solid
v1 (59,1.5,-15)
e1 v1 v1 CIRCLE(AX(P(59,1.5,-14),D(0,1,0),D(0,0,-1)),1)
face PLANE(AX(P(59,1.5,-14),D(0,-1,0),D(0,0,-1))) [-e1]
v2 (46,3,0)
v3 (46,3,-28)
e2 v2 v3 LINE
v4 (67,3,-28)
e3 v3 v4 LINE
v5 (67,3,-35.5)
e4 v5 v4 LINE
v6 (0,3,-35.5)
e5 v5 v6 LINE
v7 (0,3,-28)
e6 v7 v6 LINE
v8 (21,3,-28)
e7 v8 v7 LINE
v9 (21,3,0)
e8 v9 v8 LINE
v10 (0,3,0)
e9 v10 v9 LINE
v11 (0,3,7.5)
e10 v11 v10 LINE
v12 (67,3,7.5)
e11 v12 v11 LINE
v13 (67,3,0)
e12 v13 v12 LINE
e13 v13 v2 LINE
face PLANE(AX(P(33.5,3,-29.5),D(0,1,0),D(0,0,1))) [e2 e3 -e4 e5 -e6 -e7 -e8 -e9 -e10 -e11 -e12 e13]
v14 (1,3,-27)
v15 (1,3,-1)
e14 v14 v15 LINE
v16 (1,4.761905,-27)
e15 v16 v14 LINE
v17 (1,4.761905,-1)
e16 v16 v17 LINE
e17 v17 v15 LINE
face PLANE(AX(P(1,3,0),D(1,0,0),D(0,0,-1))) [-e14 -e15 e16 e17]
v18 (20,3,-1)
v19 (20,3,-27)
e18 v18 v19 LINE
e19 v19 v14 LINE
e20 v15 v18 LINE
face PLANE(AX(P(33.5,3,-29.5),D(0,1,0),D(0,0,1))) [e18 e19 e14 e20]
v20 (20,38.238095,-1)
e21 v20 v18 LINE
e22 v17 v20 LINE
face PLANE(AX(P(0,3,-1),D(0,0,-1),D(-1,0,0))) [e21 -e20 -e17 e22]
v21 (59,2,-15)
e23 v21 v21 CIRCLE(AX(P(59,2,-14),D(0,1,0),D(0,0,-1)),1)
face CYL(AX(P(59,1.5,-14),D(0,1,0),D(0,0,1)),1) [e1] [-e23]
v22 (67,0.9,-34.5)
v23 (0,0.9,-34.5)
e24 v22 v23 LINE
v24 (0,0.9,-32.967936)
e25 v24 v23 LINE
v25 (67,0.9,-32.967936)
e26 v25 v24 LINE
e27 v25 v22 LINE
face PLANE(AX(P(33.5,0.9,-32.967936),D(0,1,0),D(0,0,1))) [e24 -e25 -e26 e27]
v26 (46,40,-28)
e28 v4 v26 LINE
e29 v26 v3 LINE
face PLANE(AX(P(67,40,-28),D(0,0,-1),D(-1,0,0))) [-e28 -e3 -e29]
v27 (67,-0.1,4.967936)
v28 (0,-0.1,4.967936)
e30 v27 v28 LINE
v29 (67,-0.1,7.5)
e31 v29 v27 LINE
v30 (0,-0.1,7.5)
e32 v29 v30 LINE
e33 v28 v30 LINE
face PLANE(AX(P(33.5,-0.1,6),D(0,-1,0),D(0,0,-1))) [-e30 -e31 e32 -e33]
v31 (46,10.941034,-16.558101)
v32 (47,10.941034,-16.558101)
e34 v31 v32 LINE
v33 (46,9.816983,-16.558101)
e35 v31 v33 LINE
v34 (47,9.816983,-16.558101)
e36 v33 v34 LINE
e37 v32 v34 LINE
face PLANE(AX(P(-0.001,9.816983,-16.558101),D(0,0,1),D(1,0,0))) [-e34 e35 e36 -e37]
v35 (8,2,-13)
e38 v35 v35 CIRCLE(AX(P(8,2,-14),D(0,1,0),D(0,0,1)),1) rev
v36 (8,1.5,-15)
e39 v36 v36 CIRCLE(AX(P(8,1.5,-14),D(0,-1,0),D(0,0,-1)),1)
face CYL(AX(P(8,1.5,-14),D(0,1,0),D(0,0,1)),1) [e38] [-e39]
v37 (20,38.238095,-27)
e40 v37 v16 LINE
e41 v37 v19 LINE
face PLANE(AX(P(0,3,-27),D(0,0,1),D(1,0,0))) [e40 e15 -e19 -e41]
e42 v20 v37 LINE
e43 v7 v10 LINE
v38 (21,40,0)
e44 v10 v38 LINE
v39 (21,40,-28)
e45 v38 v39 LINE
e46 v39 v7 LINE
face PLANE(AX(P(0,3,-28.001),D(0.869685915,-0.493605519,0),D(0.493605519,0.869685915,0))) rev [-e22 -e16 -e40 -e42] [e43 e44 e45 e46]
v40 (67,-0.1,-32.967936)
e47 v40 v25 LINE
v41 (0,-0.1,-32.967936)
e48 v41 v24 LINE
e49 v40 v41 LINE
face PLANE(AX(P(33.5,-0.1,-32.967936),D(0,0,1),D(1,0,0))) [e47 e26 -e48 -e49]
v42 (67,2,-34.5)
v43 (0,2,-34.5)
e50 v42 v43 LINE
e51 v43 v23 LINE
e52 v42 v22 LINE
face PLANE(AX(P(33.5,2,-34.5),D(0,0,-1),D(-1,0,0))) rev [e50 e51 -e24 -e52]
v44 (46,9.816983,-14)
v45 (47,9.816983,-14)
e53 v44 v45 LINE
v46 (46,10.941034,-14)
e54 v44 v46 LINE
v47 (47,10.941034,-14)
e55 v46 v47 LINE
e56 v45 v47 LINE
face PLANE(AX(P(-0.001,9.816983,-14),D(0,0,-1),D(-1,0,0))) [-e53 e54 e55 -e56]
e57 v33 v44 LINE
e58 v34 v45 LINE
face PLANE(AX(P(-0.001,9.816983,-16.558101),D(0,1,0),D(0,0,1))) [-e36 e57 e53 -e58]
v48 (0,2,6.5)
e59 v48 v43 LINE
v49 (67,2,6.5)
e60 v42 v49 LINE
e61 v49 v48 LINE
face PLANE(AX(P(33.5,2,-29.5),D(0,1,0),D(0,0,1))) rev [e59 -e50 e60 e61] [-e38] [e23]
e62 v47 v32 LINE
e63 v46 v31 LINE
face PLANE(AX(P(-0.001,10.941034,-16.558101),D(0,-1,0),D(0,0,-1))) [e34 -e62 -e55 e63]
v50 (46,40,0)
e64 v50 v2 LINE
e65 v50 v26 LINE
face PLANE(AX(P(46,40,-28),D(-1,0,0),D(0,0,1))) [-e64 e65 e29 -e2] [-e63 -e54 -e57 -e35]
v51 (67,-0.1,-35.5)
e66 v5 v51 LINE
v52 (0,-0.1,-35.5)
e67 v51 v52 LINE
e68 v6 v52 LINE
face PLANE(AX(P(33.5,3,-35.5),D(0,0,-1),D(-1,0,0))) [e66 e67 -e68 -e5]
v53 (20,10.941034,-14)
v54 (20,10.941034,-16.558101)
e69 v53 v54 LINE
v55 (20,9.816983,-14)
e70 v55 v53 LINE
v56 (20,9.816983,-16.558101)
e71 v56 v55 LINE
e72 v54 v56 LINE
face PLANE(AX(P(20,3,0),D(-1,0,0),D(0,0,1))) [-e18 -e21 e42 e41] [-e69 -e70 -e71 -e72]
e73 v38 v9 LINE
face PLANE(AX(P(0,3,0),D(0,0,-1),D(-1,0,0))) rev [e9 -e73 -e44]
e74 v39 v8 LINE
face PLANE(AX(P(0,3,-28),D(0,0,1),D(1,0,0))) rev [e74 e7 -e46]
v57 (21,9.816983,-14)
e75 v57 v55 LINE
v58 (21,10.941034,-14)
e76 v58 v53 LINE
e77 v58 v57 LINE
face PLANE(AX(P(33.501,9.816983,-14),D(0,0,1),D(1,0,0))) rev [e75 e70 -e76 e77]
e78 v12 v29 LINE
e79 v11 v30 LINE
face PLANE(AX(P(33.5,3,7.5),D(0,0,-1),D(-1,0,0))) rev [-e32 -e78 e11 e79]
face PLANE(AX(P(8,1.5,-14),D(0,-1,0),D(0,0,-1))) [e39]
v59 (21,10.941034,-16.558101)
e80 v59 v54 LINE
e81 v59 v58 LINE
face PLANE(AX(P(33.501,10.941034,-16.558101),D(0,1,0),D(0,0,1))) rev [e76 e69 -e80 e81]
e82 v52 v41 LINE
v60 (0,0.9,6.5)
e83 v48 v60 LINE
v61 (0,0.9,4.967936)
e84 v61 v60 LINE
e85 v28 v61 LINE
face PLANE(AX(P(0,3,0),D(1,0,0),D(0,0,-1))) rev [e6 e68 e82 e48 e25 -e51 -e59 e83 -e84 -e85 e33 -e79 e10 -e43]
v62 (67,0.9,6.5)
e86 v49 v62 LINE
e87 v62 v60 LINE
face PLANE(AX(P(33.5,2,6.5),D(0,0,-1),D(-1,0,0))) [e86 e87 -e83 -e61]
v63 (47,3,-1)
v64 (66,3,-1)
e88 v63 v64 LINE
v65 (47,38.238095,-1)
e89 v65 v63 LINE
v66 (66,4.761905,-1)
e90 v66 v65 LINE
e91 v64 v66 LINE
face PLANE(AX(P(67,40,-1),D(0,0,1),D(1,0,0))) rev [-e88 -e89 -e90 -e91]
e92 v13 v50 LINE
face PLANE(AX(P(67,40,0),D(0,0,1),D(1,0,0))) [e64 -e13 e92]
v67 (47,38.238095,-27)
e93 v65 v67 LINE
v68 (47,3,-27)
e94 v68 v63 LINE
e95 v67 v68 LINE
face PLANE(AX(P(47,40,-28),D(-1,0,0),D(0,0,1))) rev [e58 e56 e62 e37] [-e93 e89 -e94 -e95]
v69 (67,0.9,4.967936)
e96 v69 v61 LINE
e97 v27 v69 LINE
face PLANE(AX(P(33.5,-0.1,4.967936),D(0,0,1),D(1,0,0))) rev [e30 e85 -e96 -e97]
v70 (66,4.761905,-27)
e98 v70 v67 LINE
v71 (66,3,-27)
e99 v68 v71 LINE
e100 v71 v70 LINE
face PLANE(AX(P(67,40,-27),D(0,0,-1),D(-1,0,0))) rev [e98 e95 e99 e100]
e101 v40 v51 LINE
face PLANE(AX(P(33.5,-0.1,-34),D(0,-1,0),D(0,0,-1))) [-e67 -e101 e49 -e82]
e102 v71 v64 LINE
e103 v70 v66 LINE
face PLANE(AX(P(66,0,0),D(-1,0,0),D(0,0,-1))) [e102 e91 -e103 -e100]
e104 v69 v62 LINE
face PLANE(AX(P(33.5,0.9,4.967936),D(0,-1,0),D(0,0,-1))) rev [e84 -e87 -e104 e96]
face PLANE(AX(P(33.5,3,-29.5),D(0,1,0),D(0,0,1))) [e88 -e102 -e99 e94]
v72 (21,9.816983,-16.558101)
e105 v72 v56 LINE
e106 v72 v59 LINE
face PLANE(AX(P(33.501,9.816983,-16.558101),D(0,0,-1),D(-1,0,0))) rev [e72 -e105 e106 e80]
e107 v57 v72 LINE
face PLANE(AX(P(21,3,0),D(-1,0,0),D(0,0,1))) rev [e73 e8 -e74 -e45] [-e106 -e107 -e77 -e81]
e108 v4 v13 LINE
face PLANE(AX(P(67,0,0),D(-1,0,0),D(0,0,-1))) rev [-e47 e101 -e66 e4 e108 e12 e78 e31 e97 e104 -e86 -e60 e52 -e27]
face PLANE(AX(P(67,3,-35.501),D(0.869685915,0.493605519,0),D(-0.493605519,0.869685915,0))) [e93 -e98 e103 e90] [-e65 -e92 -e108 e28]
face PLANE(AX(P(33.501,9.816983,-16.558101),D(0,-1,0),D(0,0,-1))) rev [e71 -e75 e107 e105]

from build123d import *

# Parameters (mm, degrees)
SKETCH1_W           = 21
SKETCH1_H           = 28
BOSS_EXTRUDE1_DEPTH = 3
SKETCH2_W           = 21
SKETCH2_H           = 28
BOSS_EXTRUDE2_DEPTH = 37
CUT_EXTRUDE1_REACH  = 55.151
SHELL1_T            = -1
BOSS_EXTRUDE3_DEPTH = 33.5
SKETCH9_W           = 21
SKETCH9_H           = 28
CUT_EXTRUDE2_DEPTH  = 2
SKETCH10_R          = 1
BOSS_EXTRUDE4_DEPTH = 0.5
CUT_EXTRUDE3_REACH  = 59.099
SKETCH11_W          = 2.558101437
SKETCH11_H          = 1.124051106
MIRROR5_START       = -28
MIRROR5_DEPTH       = 28
MIRROR5_START_2     = 1.5
MIRROR5_2_OUTLINE_R = 1
MIRROR5_2_DEPTH     = 0.5
SHELL3_START        = -27
SHELL3_DEPTH        = 26


# Read off the part's stored shape, not the designer's step: Mirror5, Shell3
with BuildPart() as part:
    # Sketch1 → Boss-Extrude1 (new body)
    with BuildSketch(Plane(origin=(0, 0, 0), x_dir=(1, 0, 0), z_dir=(0, 1, 0))):
        with Locations((10.5, 14)):
            Rectangle(SKETCH1_W, SKETCH1_H)
    extrude(amount=BOSS_EXTRUDE1_DEPTH)

    # Sketch2 → Boss-Extrude2 (add)
    with BuildSketch(Plane(origin=(0, 3, 0), x_dir=(1, 0, 0), z_dir=(0, 1, 0))):
        with Locations((10.5, 14)):
            Rectangle(SKETCH2_W, SKETCH2_H)
    extrude(amount=BOSS_EXTRUDE2_DEPTH)

    # Sketch3 → Cut-Extrude1 (cut, up to next)
    with BuildSketch(Plane.XY, mode=Mode.PRIVATE) as cut_extrude1_sk1:
        Polygon((0, 3), (21, 40), (0, 40), align=None)
    cut_extrude1_tool1 = extrude(cut_extrude1_sk1.sketch, amount=-CUT_EXTRUDE1_REACH, mode=Mode.PRIVATE) & part.part
    add(cut_extrude1_tool1.solids().sort_by_distance((7, 27.666667, 0))[0], mode=Mode.SUBTRACT)

    # Shell1
    shell1_openings = [part.faces().sort_by_distance(p)[0] for p in [
        (10.5, 21.5, -14),
    ]]
    offset(amount=SHELL1_T, openings=shell1_openings, kind=Kind.INTERSECTION)

    # Sketch7 → Boss-Extrude3 (add)
    with BuildSketch(Plane(origin=(0, 0, 0), x_dir=(0, 0, -1), z_dir=(1, 0, 0))):
        Polygon((34, -0.1), (32.967936428, -0.1), (32.967936428, 0.9), (34.5, 0.9), (34.5, 2), (29.5, 2), (-1.5, 2), (-6.5, 2), (-6.5, 0.9), (-4.967936428, 0.9), (-4.967936428, -0.1), (-6, -0.1), (-7.5, -0.1), (-7.5, 3), (-1.5, 3), (29.5, 3), (35.5, 3), (35.5, -0.1), align=None)
    boss_extrude3 = extrude(amount=BOSS_EXTRUDE3_DEPTH)

    # Sketch9 → Cut-Extrude2 (cut)
    with BuildSketch(Plane.XZ):
        with Locations((10.5, -14)):
            Rectangle(SKETCH9_W, SKETCH9_H)
    extrude(amount=-CUT_EXTRUDE2_DEPTH, mode=Mode.SUBTRACT)

    # Sketch10 → Boss-Extrude4 (add)
    with BuildSketch(Plane.XZ.offset(-2)):
        with Locations(Location((8, -14, 0), (0, 0, 90))):
            Circle(SKETCH10_R)
    extrude(amount=BOSS_EXTRUDE4_DEPTH)

    # Sketch11 → Cut-Extrude3 (cut, up to next)
    with BuildSketch(Plane.ZY.offset(-20), mode=Mode.PRIVATE) as cut_extrude3_sk1:
        with Locations((-15.279050719, 10.379008518)):
            Rectangle(SKETCH11_W, SKETCH11_H)
    cut_extrude3_tool1 = extrude(cut_extrude3_sk1.sketch, amount=-CUT_EXTRUDE3_REACH, mode=Mode.PRIVATE) & part.part
    cut_extrude3 = cut_extrude3_tool1.solids().sort_by_distance((20, 10.379009, -15.279051))[0]
    add(cut_extrude3, mode=Mode.SUBTRACT)

    # Mirror4: Boss-Extrude3 across plane
    add(boss_extrude3.mirror(Plane(origin=(33.5, 0, 0), x_dir=(0, 0, 1), z_dir=(1, 0, 0))))

    # Mirror5 outline → Mirror5 (add)
    with BuildSketch(Plane.XY.offset(MIRROR5_START)):
        Polygon((67, 3), (46, 40), (46, 3), align=None)
    extrude(amount=MIRROR5_DEPTH)

    # Mirror5 2 outline → Mirror5 2 (add)
    with BuildSketch(Plane(origin=(0, 0, 0), x_dir=(1, 0, 0), z_dir=(0, 1, 0)).offset(MIRROR5_START_2)):
        with Locations((59, 14)):
            Circle(MIRROR5_2_OUTLINE_R)
    extrude(amount=MIRROR5_2_DEPTH)

    # Shell3 outline → Shell3 (cut)
    with BuildSketch(Plane.XY.offset(SHELL3_START)):
        Polygon((47, 3), (66, 3), (66, 4.761904762), (47, 38.238095238), align=None)
    extrude(amount=SHELL3_DEPTH, mode=Mode.SUBTRACT)

    # Mirror6: Cut-Extrude3 across plane
    add(cut_extrude3.mirror(Plane(origin=(33.5, 0, 0), x_dir=(0, 0, 1), z_dir=(1, 0, 0))), mode=Mode.SUBTRACT)


solid = part.part
